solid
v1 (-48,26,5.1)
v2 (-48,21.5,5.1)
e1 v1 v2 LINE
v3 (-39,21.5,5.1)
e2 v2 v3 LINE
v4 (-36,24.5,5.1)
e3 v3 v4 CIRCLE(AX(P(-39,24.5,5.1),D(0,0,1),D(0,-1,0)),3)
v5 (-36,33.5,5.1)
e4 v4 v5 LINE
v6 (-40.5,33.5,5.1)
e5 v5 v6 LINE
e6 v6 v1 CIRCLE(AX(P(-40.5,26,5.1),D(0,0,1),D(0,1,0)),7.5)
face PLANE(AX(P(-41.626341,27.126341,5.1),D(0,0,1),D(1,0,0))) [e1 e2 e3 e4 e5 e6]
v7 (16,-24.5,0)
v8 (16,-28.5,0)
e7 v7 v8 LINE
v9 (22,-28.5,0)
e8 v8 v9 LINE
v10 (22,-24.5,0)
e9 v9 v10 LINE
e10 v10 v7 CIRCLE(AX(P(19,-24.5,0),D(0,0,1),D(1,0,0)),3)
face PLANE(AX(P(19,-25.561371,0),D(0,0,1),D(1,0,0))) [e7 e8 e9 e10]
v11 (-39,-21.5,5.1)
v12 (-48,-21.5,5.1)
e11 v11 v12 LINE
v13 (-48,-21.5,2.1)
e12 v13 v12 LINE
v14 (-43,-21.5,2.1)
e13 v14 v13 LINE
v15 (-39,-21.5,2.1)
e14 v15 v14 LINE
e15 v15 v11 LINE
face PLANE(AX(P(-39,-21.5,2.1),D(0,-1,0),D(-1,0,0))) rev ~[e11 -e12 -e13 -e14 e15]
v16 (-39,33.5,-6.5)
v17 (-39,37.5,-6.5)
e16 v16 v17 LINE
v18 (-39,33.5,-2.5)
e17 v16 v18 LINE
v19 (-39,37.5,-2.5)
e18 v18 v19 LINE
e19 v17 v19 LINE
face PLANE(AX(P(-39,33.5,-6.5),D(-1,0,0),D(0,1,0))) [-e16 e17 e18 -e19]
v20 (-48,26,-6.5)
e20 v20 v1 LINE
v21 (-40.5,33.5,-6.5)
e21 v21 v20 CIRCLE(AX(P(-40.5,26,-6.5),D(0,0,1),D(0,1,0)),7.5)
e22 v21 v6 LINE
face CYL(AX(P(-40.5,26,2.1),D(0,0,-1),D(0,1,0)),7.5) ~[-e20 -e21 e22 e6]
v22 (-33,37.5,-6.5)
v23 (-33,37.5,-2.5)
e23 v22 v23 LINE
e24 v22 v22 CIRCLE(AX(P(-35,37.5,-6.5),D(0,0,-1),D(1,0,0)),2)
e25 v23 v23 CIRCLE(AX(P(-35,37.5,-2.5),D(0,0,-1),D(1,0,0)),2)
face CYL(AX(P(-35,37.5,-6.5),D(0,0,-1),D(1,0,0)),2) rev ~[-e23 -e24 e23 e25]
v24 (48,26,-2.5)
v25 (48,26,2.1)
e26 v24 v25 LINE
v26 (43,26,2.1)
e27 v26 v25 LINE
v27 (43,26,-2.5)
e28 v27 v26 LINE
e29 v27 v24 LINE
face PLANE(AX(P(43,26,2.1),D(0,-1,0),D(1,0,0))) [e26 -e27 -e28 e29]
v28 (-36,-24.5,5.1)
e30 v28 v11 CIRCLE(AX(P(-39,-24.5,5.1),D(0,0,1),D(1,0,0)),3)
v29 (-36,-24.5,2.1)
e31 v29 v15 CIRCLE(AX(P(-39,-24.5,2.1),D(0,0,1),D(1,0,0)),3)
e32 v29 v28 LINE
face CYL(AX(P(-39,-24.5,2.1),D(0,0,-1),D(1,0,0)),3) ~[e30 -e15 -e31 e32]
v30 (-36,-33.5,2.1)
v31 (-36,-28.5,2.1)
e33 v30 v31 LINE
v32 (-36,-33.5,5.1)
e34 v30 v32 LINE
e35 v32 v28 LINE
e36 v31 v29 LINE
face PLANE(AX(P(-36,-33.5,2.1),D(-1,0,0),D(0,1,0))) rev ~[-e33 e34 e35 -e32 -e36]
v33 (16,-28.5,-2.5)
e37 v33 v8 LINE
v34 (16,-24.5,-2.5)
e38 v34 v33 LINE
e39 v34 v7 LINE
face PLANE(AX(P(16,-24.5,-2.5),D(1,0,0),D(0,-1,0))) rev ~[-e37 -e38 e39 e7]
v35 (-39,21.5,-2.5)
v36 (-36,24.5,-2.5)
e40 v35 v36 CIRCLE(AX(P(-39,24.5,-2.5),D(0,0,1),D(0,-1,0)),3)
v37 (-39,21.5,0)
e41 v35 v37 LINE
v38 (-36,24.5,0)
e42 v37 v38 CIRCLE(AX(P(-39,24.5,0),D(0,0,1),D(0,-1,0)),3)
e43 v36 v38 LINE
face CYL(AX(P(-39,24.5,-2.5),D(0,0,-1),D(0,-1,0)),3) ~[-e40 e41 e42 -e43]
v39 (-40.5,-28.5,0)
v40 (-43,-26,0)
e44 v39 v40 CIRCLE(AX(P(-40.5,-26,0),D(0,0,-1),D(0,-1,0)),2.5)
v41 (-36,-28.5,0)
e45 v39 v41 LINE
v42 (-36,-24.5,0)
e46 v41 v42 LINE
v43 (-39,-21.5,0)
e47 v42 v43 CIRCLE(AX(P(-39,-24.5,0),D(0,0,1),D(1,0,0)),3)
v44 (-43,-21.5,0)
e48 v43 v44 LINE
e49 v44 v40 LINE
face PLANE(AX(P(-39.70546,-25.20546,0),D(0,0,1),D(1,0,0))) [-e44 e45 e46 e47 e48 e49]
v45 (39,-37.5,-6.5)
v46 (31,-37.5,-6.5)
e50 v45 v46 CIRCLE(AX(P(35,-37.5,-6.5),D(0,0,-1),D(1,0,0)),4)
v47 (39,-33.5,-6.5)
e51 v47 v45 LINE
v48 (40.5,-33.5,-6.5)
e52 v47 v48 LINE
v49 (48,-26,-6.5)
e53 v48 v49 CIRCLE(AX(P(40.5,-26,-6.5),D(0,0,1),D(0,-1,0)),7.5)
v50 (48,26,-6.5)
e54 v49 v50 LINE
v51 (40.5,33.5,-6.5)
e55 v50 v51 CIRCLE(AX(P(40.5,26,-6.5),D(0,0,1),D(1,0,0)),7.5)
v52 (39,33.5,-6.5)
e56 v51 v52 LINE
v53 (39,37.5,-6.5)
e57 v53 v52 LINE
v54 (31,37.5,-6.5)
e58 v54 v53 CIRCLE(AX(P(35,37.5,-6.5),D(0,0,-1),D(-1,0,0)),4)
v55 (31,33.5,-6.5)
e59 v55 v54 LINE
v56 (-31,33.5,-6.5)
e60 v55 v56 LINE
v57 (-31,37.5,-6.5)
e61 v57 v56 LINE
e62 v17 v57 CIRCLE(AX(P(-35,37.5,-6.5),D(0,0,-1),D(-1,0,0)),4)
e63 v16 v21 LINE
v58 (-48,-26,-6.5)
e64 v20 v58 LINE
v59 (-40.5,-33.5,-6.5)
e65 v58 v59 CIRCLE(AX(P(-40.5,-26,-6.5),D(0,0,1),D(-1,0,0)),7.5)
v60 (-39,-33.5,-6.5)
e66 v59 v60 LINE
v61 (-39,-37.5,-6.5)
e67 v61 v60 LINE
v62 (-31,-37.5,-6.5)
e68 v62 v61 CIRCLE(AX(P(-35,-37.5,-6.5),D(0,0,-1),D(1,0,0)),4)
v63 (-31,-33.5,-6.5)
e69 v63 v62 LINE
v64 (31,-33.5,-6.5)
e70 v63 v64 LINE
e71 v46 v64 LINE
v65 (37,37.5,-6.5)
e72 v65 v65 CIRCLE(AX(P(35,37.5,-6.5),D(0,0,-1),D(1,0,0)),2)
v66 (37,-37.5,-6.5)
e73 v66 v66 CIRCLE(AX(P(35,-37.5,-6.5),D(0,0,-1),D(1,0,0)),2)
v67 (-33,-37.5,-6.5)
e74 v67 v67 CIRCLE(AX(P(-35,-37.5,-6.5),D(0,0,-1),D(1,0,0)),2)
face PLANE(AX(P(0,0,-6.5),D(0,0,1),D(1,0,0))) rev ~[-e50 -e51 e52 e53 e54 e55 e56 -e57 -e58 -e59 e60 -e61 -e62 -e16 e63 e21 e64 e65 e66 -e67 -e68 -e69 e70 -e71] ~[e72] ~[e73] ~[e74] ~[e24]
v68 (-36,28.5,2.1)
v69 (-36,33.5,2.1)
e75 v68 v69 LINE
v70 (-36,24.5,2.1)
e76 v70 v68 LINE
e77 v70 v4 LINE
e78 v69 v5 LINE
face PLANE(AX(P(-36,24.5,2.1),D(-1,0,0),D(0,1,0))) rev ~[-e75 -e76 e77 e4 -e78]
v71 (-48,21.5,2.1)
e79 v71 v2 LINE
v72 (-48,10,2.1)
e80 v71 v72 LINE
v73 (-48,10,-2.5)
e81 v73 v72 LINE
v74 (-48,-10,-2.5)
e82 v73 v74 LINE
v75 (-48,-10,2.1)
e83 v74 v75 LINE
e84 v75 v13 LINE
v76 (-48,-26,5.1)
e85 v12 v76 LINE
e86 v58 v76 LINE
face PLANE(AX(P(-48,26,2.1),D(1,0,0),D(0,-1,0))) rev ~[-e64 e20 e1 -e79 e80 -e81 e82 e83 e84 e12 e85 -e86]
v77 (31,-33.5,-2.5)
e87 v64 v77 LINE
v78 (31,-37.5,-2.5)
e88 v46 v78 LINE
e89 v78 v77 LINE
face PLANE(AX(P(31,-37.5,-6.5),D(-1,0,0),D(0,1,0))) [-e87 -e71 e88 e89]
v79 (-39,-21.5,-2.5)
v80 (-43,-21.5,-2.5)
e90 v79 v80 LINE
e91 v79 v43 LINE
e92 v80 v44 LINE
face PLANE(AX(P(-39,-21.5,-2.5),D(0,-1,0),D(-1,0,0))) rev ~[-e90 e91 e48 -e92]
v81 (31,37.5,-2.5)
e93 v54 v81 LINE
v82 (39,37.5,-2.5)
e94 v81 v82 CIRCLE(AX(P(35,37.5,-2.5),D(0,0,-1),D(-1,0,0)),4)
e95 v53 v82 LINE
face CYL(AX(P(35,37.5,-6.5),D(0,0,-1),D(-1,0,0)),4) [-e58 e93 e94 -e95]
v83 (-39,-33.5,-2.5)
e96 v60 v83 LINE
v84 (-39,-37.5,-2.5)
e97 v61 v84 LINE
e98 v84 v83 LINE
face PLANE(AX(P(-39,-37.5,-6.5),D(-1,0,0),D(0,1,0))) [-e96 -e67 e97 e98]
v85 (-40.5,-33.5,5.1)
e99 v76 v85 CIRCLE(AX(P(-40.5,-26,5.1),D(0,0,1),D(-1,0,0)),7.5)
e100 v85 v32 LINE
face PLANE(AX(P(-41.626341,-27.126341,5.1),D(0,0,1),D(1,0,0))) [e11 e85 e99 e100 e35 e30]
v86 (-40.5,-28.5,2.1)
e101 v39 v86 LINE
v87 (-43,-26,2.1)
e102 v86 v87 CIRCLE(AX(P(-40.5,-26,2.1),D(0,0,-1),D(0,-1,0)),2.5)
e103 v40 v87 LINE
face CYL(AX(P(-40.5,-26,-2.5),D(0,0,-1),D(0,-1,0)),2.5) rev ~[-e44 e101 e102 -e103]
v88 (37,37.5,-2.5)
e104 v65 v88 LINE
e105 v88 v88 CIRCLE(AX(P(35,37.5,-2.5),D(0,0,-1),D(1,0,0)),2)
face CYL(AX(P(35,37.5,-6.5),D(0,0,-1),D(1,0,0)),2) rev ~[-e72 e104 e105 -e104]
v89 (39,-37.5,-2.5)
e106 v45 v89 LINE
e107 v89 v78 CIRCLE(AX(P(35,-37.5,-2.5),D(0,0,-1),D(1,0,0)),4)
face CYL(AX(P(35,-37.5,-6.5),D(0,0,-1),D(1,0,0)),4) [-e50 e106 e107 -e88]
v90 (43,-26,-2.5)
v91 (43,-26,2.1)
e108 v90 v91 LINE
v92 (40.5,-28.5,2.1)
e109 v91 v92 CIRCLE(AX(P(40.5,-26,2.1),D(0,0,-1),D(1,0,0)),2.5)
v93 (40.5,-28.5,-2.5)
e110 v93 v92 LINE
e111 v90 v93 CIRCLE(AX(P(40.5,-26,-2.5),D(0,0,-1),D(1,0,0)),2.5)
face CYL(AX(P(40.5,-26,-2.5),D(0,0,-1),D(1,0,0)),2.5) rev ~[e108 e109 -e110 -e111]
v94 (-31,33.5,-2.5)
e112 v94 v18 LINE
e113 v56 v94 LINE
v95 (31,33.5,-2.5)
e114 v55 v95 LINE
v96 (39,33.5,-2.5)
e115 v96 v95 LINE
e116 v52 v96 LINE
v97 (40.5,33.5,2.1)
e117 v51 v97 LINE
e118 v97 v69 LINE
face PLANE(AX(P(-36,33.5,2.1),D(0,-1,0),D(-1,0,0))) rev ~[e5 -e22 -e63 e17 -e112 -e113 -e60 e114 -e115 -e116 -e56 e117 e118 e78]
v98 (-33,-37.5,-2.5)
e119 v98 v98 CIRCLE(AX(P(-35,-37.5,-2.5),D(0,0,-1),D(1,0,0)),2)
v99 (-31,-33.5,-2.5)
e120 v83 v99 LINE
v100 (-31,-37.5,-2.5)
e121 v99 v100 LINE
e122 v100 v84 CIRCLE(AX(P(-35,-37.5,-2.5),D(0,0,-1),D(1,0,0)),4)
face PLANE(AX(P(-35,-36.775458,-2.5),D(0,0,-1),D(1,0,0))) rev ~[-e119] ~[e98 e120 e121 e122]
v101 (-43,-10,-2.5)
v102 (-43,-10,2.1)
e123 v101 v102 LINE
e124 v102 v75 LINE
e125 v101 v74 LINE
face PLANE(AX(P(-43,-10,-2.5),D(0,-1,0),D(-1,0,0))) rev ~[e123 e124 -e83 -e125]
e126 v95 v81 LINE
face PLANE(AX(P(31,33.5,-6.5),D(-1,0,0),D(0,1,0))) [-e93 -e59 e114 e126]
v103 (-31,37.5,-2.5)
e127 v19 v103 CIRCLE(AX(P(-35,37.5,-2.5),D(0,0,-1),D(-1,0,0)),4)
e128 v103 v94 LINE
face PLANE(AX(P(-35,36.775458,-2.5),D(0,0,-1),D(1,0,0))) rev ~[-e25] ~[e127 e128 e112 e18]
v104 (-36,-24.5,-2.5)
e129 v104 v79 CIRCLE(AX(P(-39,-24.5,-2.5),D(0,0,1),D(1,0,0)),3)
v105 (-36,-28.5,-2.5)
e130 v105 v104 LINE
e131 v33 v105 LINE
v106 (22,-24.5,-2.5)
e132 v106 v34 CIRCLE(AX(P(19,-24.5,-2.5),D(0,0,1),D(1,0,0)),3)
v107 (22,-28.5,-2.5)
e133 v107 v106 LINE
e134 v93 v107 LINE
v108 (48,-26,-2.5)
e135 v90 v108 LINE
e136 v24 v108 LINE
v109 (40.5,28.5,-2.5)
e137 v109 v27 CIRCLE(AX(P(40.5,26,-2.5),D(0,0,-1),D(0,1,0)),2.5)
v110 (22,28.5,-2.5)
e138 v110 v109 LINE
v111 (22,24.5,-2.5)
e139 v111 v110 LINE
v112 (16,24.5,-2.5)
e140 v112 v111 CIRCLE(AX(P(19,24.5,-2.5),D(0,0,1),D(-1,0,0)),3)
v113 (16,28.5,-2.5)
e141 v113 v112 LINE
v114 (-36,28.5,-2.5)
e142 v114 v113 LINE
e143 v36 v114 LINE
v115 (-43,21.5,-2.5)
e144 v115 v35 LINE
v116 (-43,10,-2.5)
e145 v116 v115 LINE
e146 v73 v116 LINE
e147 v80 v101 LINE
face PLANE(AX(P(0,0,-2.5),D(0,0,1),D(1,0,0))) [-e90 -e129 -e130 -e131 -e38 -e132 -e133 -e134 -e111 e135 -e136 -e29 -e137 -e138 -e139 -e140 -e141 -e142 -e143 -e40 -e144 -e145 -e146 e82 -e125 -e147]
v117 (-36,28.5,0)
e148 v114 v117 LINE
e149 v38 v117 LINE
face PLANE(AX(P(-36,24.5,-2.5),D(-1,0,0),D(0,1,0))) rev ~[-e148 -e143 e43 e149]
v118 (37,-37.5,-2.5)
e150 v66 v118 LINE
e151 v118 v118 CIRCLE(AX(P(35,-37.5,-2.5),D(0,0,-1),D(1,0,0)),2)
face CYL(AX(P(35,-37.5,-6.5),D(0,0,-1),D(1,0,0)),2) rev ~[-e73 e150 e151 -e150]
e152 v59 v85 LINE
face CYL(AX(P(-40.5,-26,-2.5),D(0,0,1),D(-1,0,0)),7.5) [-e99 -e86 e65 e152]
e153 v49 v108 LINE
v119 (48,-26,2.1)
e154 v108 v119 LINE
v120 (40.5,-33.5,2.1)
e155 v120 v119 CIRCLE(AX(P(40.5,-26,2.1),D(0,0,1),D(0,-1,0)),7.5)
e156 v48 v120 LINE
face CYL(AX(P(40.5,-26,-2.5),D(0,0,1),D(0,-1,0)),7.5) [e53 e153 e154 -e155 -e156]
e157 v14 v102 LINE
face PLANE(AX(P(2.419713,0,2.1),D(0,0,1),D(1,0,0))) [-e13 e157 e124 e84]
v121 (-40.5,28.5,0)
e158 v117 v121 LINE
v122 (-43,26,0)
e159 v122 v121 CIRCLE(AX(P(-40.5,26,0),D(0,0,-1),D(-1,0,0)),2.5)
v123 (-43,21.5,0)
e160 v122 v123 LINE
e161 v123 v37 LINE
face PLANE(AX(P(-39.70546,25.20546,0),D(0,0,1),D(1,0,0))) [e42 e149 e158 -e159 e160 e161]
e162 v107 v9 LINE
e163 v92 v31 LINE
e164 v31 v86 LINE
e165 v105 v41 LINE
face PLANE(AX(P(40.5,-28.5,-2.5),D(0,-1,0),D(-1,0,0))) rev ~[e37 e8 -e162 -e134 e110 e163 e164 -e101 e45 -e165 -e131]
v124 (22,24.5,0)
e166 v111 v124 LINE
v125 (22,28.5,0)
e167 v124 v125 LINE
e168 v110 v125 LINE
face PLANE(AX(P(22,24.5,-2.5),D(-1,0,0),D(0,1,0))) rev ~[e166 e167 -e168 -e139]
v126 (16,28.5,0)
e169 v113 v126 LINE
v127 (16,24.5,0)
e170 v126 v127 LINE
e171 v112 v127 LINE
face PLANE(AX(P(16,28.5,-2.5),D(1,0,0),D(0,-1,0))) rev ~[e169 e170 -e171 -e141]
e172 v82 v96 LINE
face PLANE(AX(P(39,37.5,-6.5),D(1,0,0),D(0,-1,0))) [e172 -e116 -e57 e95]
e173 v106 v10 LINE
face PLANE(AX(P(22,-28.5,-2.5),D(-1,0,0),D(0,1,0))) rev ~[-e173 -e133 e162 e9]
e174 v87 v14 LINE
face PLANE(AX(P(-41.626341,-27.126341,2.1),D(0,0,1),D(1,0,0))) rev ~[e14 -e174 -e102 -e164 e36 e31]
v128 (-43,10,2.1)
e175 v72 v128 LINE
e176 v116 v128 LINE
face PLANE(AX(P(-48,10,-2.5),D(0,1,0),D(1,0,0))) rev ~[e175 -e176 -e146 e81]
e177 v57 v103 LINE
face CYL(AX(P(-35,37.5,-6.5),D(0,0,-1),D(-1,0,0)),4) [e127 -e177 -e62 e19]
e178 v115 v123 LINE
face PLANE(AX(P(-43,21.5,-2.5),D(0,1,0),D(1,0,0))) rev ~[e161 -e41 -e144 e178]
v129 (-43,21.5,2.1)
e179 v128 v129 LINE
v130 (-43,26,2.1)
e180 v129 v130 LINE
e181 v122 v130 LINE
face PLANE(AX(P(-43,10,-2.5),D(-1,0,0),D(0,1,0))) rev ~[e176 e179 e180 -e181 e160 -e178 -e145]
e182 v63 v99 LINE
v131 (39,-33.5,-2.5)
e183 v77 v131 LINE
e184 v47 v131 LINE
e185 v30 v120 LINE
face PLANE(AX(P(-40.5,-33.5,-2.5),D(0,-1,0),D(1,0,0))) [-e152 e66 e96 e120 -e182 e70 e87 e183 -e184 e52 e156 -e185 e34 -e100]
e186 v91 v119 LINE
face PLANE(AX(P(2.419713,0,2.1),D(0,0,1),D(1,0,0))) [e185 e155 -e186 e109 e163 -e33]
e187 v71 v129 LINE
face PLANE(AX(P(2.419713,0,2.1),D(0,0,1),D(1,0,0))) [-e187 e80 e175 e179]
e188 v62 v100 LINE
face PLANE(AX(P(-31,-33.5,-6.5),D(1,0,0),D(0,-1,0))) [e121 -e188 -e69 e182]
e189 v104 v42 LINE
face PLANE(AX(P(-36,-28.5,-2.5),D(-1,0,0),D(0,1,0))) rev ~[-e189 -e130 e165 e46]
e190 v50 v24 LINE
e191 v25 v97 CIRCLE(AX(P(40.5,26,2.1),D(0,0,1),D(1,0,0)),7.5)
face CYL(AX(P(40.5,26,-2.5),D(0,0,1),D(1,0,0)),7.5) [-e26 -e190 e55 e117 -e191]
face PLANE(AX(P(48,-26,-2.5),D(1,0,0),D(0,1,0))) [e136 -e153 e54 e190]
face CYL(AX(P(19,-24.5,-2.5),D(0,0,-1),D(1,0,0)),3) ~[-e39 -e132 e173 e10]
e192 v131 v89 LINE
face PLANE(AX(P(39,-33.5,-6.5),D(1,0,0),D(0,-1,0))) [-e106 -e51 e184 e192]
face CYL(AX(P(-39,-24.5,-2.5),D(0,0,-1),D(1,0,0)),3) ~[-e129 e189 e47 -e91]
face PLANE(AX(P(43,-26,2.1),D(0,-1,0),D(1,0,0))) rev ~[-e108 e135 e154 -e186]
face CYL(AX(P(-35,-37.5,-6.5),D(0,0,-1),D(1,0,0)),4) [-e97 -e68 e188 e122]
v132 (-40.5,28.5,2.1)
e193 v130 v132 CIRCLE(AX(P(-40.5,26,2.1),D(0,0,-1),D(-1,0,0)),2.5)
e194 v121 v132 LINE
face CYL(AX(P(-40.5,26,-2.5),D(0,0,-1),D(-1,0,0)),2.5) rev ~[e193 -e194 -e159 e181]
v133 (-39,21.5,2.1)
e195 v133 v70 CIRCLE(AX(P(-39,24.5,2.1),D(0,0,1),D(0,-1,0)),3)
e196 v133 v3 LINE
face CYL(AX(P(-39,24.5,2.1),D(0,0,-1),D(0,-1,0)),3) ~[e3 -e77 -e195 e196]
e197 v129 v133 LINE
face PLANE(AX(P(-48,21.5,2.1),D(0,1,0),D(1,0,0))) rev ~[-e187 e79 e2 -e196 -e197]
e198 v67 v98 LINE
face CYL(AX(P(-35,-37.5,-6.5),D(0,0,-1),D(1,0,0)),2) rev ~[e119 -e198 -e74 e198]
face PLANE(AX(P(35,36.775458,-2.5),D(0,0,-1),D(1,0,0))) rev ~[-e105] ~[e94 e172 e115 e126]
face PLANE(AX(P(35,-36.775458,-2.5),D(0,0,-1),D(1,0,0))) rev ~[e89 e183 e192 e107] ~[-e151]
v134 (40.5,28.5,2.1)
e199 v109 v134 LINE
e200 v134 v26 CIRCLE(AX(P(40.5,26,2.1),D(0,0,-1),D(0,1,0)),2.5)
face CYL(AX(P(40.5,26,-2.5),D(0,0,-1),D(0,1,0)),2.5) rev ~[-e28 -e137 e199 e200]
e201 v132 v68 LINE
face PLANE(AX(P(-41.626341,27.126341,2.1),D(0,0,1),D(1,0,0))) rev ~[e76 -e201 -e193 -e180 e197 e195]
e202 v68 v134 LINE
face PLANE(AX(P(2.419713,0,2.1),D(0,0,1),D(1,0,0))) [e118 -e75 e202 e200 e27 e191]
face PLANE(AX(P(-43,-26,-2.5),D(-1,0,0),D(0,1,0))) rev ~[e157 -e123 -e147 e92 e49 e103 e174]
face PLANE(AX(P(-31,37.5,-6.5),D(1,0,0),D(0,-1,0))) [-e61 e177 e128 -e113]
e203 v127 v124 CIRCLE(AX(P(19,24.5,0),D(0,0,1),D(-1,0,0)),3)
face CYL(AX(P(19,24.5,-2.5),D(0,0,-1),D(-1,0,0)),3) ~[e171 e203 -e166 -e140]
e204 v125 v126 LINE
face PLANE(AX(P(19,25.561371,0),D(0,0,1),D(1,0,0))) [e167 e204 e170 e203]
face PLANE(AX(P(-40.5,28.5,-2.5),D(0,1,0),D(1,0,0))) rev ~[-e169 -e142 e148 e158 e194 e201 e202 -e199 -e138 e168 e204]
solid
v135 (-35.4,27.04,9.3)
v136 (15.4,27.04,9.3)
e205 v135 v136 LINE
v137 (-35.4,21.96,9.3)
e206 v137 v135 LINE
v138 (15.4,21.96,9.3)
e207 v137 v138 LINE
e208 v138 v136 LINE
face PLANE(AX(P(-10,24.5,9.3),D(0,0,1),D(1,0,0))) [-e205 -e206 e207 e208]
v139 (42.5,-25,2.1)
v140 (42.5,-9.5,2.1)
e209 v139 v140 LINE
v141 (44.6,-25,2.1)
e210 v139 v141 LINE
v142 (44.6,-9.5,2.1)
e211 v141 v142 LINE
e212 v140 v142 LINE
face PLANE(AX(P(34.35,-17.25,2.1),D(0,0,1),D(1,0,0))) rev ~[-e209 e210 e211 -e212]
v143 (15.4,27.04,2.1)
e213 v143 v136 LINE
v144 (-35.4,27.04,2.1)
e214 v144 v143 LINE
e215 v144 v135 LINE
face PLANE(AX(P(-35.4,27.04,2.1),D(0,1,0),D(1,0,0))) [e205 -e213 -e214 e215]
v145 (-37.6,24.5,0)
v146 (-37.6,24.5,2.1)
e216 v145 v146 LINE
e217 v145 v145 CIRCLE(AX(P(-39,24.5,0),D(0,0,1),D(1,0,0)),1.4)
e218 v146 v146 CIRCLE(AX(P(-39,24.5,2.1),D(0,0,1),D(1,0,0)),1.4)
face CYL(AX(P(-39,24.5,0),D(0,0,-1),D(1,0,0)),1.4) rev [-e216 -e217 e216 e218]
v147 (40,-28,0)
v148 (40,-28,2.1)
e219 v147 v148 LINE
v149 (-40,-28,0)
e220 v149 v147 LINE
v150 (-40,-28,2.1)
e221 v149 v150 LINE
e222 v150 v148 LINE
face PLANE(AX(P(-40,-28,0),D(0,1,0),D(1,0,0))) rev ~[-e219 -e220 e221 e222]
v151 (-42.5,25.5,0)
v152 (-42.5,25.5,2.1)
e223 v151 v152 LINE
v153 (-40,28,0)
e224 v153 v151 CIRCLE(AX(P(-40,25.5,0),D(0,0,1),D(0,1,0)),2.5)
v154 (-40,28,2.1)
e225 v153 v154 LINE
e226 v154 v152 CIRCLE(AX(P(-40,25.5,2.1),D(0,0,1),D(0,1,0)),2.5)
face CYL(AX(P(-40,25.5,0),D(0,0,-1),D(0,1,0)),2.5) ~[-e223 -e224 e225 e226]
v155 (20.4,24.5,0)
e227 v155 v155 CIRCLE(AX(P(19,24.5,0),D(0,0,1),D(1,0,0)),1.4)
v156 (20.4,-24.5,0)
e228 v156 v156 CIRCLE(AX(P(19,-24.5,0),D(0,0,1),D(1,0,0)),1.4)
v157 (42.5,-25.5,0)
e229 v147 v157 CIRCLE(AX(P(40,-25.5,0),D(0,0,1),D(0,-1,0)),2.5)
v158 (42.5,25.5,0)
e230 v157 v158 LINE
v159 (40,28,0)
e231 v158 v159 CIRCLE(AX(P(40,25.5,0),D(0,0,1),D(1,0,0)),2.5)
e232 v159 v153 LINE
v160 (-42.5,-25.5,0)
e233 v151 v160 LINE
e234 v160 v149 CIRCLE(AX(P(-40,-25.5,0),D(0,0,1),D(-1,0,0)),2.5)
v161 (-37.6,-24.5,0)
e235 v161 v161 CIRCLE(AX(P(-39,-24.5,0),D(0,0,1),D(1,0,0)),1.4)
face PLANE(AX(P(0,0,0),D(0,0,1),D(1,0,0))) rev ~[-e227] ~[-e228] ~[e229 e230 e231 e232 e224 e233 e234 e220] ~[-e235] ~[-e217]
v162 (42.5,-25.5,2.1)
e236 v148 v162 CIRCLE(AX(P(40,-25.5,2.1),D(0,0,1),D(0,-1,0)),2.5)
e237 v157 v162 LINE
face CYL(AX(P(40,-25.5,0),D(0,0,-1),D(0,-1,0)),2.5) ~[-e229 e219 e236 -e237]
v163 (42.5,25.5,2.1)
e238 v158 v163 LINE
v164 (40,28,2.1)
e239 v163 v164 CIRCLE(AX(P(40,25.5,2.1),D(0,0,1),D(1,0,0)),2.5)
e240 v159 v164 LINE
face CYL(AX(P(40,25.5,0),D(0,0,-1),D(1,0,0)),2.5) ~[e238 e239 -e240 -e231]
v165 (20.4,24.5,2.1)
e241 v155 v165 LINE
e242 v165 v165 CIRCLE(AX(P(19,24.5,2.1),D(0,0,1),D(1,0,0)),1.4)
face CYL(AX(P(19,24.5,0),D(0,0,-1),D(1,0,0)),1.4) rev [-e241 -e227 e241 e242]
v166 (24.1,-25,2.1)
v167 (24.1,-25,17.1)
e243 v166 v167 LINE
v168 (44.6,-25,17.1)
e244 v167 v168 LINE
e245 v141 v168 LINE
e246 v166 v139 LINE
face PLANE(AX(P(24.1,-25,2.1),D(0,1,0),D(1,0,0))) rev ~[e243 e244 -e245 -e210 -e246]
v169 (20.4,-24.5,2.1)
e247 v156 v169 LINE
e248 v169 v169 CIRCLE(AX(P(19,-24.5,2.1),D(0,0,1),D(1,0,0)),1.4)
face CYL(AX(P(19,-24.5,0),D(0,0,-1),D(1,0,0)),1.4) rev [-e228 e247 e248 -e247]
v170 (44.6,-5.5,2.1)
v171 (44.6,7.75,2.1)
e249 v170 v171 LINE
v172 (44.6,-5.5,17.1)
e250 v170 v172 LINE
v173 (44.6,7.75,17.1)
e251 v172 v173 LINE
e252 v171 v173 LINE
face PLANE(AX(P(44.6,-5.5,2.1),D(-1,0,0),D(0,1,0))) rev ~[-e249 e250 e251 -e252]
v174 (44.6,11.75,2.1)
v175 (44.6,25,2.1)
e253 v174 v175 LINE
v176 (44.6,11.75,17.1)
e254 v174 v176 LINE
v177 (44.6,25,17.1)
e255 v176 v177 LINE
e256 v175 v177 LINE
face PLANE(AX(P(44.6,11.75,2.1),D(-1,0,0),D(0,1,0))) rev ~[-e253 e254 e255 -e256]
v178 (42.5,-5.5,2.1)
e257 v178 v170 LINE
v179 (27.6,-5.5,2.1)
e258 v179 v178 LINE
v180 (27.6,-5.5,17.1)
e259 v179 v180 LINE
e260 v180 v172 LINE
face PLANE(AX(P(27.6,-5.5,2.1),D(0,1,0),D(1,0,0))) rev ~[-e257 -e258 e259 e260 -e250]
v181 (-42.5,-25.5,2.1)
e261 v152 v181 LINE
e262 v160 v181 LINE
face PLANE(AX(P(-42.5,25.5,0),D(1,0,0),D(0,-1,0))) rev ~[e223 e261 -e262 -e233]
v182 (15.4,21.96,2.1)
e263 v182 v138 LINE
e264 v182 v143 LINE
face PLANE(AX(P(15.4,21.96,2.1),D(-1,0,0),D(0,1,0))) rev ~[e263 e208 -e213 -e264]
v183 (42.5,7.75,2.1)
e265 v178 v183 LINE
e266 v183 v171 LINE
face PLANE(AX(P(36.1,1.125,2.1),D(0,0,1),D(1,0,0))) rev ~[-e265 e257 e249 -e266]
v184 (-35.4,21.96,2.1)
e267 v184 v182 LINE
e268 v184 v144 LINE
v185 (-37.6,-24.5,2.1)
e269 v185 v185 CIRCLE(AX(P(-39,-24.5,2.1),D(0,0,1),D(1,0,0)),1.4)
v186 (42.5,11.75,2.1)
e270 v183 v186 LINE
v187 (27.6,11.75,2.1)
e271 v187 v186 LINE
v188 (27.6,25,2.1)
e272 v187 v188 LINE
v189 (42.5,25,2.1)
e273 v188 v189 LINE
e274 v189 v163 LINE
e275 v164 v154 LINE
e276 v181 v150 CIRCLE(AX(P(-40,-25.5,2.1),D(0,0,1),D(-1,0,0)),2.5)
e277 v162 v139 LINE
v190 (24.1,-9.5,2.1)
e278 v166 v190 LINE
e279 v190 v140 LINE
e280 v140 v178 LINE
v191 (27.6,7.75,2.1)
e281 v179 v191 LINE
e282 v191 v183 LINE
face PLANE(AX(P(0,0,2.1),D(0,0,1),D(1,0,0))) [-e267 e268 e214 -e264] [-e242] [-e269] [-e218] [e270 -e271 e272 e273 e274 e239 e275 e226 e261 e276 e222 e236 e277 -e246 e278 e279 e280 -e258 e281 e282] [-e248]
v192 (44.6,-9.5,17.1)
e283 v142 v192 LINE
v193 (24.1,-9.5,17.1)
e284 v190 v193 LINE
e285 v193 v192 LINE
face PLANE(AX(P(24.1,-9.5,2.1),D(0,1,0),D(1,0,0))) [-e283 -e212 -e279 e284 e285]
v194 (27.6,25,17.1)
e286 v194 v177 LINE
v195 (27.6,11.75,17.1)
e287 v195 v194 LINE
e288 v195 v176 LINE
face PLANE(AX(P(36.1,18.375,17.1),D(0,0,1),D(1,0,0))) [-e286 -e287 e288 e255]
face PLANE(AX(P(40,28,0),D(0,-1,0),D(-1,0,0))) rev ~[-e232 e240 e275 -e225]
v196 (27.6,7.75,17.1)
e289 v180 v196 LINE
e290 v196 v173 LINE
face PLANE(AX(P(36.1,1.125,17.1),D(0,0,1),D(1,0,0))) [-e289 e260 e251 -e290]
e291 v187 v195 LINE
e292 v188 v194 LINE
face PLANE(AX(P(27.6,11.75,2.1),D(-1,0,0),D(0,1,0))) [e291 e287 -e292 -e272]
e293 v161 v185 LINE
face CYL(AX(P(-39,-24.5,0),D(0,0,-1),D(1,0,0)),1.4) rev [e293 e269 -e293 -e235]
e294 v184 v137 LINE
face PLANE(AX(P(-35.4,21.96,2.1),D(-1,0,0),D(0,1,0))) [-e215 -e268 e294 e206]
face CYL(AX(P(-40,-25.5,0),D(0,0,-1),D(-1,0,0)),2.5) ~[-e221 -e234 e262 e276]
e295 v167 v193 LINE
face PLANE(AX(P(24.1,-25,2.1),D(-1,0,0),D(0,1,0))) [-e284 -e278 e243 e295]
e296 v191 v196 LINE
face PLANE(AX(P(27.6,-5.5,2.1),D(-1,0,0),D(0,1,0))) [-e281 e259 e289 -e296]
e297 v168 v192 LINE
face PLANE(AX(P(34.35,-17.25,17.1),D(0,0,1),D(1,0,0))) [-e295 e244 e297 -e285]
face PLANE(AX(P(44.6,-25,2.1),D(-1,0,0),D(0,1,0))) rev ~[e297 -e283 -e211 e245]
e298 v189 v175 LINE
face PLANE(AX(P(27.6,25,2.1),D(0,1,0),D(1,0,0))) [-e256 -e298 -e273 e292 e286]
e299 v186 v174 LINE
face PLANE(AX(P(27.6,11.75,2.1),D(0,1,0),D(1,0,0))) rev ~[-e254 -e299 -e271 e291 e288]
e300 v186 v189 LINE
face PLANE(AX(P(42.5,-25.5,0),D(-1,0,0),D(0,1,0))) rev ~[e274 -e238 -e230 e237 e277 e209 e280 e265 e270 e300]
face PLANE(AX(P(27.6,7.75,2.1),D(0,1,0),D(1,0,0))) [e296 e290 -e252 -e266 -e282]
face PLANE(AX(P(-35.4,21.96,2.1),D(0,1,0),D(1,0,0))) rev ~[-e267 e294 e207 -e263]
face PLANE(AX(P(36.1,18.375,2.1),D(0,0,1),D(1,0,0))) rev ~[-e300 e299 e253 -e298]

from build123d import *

# Parameters (mm, degrees)
F0_R      = 1.4
F1_DEPTH  = 2.1
F2_W      = 50.8
F2_H      = 5.08
F3_DEPTH  = 7.2
F4_W      = 17
F4_H      = 13.25
F4_W_2    = 20.5
F4_H_2    = 15.5
F5_DEPTH  = 15
F8_DEPTH  = 4.6
F10_DEPTH = 2.5
F12_DEPTH = 4
F13_W     = 32.5408354402
F13_H     = 52
F14_DEPTH = 4.6
F16_DEPTH = 3
F17_R     = 2
F18_DEPTH = 4


with BuildPart() as f1:
    # F0 (on Top) → F1 (new body)
    with BuildSketch(Plane.XY):
        with BuildLine():
            Line((40, 28), (-40, 28))
            ThreePointArc((-40, 28), (-41.767766953, 27.267766953), (-42.5, 25.5))
            Line((-42.5, 25.5), (-42.5, -25.5))
            ThreePointArc((-42.5, -25.5), (-41.767766953, -27.267766953), (-40, -28))
            Line((-40, -28), (40, -28))
            ThreePointArc((40, -28), (41.767766953, -27.267766953), (42.5, -25.5))
            Line((42.5, -25.5), (42.5, 25.5))
            ThreePointArc((42.5, 25.5), (41.767766953, 27.267766953), (40, 28))
        make_face()
        with Locations((-39, -24.5)):
            Circle(F0_R, mode=Mode.SUBTRACT)
        with Locations((19, -24.5)):
            Circle(F0_R, mode=Mode.SUBTRACT)
        with Locations((-39, 24.5)):
            Circle(F0_R, mode=Mode.SUBTRACT)
        with Locations((19, 24.5)):
            Circle(F0_R, mode=Mode.SUBTRACT)
    extrude(amount=F1_DEPTH)

    # F2 (on face) → F3 (join)
    with BuildSketch(Plane.XY.offset(2.1)):
        with Locations((-10, 24.5)):
            Rectangle(F2_W, F2_H)
    extrude(amount=F3_DEPTH)

    # F4 (on face) → F5 (join)
    with BuildSketch(Plane.XY.offset(2.1)):
        with Locations((36.1, 18.375)):
            Rectangle(F4_W, F4_H)
        with Locations((36.1, 1.125)):
            Rectangle(F4_W, F4_H)
        with Locations((34.35, -17.25)):
            Rectangle(F4_W_2, F4_H_2)
    extrude(amount=F5_DEPTH)


with BuildPart() as f8:
    # F7 (on offset) → F8 (new body, through all)
    with BuildSketch(Plane.XY.offset(-2.5)):
        with BuildLine():
            ThreePointArc((-43, 26), (-42.267766953, 27.767766953), (-40.5, 28.5))
            Line((-40.5, 28.5), (40.5, 28.5))
            ThreePointArc((40.5, 28.5), (42.267766953, 27.767766953), (43, 26))
            Line((43, 26), (43, -26))
            ThreePointArc((43, -26), (42.267766953, -27.767766953), (40.5, -28.5))
            Line((40.5, -28.5), (-40.5, -28.5))
            ThreePointArc((-40.5, -28.5), (-42.267766953, -27.767766953), (-43, -26))
            Line((-43, -26), (-43, -10))
            Line((-43, -10), (-48, -10))
            Line((-48, -10), (-48, -26))
            ThreePointArc((-48, -26), (-45.8033008589, -31.3033008589), (-40.5, -33.5))
            Line((-40.5, -33.5), (40.5, -33.5))
            ThreePointArc((40.5, -33.5), (45.8033008589, -31.3033008589), (48, -26))
            Line((48, -26), (48, 26))
            ThreePointArc((48, 26), (45.8033008589, 31.3033008589), (40.5, 33.5))
            Line((40.5, 33.5), (-40.5, 33.5))
            ThreePointArc((-40.5, 33.5), (-45.8033008589, 31.3033008589), (-48, 26))
            Line((-48, 26), (-48, 10))
            Line((-48, 10), (-43, 10))
            Line((-43, 10), (-43, 26))
        make_face()
    extrude(amount=F8_DEPTH)

    # F9 (on offset) → F10 (join, through all)
    with BuildSketch(Plane.XY.offset(-2.5)):
        with BuildLine():
            Line((22, -28.5), (22, -24.5))
            ThreePointArc((22, -24.5), (19, -21.5), (16, -24.5))
            Line((16, -24.5), (16, -28.5))
            Line((16, -28.5), (22, -28.5))
        make_face()
        with BuildLine():
            Line((22, 28.5), (16, 28.5))
            Line((16, 28.5), (16, 24.5))
            ThreePointArc((16, 24.5), (19, 21.5), (22, 24.5))
            Line((22, 24.5), (22, 28.5))
        make_face()
        with BuildLine():
            Line((-43, 21.5), (-39, 21.5))
            ThreePointArc((-39, 21.5), (-36.8786796564, 22.3786796564), (-36, 24.5))
            Line((-36, 24.5), (-36, 28.5))
            Line((-36, 28.5), (-43, 28.5))
            Line((-43, 28.5), (-43, 21.5))
        make_face()
        with BuildLine():
            ThreePointArc((-36, -24.5), (-36.8786796564, -22.3786796564), (-39, -21.5))
            Line((-39, -21.5), (-43, -21.5))
            Line((-43, -21.5), (-43, -28.5))
            Line((-43, -28.5), (-36, -28.5))
            Line((-36, -28.5), (-36, -24.5))
        make_face()
    extrude(amount=F10_DEPTH)

    # F11 (on offset) → F12 (join)
    with BuildSketch(Plane.XY.offset(-2.5)):
        with BuildLine():
            ThreePointArc((-48, -26), (-45.8033008589, -31.3033008589), (-40.5, -33.5))
            Line((-40.5, -33.5), (40.5, -33.5))
            ThreePointArc((40.5, -33.5), (45.8033008589, -31.3033008589), (48, -26))
            Line((48, -26), (48, 26))
            ThreePointArc((48, 26), (45.8033008589, 31.3033008589), (40.5, 33.5))
            Line((40.5, 33.5), (-40.5, 33.5))
            ThreePointArc((-40.5, 33.5), (-45.8033008589, 31.3033008589), (-48, 26))
            Line((-48, 26), (-48, -26))
        make_face()
    extrude(amount=-F12_DEPTH)

    # F13 (on face) → F14 (cut, through all)
    with BuildSketch(Plane.XY.offset(2.1)):
        with Locations((59.2704177201, 0)):
            Rectangle(F13_W, F13_H)
    extrude(amount=-F14_DEPTH, mode=Mode.SUBTRACT)

    # F15 (on face) → F16 (join)
    with BuildSketch(Plane.XY.offset(2.1)):
        with BuildLine():
            Line((-36, 33.5), (-40.5, 33.5))
            ThreePointArc((-40.5, 33.5), (-45.8033008589, 31.3033008589), (-48, 26))
            Line((-48, 26), (-48, 21.5))
            Line((-48, 21.5), (-39, 21.5))
            ThreePointArc((-39, 21.5), (-36.8786796564, 22.3786796564), (-36, 24.5))
            Line((-36, 24.5), (-36, 33.5))
        make_face()
        with BuildLine():
            ThreePointArc((-36, -24.5), (-36.8786796564, -22.3786796564), (-39, -21.5))
            Line((-39, -21.5), (-48, -21.5))
            Line((-48, -21.5), (-48, -26))
            ThreePointArc((-48, -26), (-45.8033008589, -31.3033008589), (-40.5, -33.5))
            Line((-40.5, -33.5), (-36, -33.5))
            Line((-36, -33.5), (-36, -24.5))
        make_face()
    extrude(amount=F16_DEPTH)

    # F17 (on face) → F18 (join)
    with BuildSketch(Plane(origin=(0, 0, -6.5), x_dir=(1, 0, 0), z_dir=(0, 0, -1))):
        with BuildLine():
            Line((-39, -33.5), (-39, -37.5))
            ThreePointArc((-39, -37.5), (-35, -41.5), (-31, -37.5))
            Line((-31, -37.5), (-31, -33.5))
            Line((-31, -33.5), (-39, -33.5))
        make_face()
        with Locations((-35, -37.5)):
            Circle(F17_R, mode=Mode.SUBTRACT)
        with BuildLine():
            Line((39, -33.5), (31, -33.5))
            Line((31, -33.5), (31, -37.5))
            ThreePointArc((31, -37.5), (35, -41.5), (39, -37.5))
            Line((39, -37.5), (39, -33.5))
        make_face()
        with Locations((35, -37.5)):
            Circle(F17_R, mode=Mode.SUBTRACT)
        with BuildLine():
            Line((31, 37.5), (31, 33.5))
            Line((31, 33.5), (39, 33.5))
            Line((39, 33.5), (39, 37.5))
            ThreePointArc((39, 37.5), (35, 41.5), (31, 37.5))
        make_face()
        with Locations((35, 37.5)):
            Circle(F17_R, mode=Mode.SUBTRACT)
        with BuildLine():
            ThreePointArc((-31, 37.5), (-35, 41.5), (-39, 37.5))
            Line((-39, 37.5), (-39, 33.5))
            Line((-39, 33.5), (-31, 33.5))
            Line((-31, 33.5), (-31, 37.5))
        make_face()
        with Locations((-35, 37.5)):
            Circle(F17_R, mode=Mode.SUBTRACT)
    extrude(amount=-F18_DEPTH)


solid = Compound([f1.part, f8.part])
